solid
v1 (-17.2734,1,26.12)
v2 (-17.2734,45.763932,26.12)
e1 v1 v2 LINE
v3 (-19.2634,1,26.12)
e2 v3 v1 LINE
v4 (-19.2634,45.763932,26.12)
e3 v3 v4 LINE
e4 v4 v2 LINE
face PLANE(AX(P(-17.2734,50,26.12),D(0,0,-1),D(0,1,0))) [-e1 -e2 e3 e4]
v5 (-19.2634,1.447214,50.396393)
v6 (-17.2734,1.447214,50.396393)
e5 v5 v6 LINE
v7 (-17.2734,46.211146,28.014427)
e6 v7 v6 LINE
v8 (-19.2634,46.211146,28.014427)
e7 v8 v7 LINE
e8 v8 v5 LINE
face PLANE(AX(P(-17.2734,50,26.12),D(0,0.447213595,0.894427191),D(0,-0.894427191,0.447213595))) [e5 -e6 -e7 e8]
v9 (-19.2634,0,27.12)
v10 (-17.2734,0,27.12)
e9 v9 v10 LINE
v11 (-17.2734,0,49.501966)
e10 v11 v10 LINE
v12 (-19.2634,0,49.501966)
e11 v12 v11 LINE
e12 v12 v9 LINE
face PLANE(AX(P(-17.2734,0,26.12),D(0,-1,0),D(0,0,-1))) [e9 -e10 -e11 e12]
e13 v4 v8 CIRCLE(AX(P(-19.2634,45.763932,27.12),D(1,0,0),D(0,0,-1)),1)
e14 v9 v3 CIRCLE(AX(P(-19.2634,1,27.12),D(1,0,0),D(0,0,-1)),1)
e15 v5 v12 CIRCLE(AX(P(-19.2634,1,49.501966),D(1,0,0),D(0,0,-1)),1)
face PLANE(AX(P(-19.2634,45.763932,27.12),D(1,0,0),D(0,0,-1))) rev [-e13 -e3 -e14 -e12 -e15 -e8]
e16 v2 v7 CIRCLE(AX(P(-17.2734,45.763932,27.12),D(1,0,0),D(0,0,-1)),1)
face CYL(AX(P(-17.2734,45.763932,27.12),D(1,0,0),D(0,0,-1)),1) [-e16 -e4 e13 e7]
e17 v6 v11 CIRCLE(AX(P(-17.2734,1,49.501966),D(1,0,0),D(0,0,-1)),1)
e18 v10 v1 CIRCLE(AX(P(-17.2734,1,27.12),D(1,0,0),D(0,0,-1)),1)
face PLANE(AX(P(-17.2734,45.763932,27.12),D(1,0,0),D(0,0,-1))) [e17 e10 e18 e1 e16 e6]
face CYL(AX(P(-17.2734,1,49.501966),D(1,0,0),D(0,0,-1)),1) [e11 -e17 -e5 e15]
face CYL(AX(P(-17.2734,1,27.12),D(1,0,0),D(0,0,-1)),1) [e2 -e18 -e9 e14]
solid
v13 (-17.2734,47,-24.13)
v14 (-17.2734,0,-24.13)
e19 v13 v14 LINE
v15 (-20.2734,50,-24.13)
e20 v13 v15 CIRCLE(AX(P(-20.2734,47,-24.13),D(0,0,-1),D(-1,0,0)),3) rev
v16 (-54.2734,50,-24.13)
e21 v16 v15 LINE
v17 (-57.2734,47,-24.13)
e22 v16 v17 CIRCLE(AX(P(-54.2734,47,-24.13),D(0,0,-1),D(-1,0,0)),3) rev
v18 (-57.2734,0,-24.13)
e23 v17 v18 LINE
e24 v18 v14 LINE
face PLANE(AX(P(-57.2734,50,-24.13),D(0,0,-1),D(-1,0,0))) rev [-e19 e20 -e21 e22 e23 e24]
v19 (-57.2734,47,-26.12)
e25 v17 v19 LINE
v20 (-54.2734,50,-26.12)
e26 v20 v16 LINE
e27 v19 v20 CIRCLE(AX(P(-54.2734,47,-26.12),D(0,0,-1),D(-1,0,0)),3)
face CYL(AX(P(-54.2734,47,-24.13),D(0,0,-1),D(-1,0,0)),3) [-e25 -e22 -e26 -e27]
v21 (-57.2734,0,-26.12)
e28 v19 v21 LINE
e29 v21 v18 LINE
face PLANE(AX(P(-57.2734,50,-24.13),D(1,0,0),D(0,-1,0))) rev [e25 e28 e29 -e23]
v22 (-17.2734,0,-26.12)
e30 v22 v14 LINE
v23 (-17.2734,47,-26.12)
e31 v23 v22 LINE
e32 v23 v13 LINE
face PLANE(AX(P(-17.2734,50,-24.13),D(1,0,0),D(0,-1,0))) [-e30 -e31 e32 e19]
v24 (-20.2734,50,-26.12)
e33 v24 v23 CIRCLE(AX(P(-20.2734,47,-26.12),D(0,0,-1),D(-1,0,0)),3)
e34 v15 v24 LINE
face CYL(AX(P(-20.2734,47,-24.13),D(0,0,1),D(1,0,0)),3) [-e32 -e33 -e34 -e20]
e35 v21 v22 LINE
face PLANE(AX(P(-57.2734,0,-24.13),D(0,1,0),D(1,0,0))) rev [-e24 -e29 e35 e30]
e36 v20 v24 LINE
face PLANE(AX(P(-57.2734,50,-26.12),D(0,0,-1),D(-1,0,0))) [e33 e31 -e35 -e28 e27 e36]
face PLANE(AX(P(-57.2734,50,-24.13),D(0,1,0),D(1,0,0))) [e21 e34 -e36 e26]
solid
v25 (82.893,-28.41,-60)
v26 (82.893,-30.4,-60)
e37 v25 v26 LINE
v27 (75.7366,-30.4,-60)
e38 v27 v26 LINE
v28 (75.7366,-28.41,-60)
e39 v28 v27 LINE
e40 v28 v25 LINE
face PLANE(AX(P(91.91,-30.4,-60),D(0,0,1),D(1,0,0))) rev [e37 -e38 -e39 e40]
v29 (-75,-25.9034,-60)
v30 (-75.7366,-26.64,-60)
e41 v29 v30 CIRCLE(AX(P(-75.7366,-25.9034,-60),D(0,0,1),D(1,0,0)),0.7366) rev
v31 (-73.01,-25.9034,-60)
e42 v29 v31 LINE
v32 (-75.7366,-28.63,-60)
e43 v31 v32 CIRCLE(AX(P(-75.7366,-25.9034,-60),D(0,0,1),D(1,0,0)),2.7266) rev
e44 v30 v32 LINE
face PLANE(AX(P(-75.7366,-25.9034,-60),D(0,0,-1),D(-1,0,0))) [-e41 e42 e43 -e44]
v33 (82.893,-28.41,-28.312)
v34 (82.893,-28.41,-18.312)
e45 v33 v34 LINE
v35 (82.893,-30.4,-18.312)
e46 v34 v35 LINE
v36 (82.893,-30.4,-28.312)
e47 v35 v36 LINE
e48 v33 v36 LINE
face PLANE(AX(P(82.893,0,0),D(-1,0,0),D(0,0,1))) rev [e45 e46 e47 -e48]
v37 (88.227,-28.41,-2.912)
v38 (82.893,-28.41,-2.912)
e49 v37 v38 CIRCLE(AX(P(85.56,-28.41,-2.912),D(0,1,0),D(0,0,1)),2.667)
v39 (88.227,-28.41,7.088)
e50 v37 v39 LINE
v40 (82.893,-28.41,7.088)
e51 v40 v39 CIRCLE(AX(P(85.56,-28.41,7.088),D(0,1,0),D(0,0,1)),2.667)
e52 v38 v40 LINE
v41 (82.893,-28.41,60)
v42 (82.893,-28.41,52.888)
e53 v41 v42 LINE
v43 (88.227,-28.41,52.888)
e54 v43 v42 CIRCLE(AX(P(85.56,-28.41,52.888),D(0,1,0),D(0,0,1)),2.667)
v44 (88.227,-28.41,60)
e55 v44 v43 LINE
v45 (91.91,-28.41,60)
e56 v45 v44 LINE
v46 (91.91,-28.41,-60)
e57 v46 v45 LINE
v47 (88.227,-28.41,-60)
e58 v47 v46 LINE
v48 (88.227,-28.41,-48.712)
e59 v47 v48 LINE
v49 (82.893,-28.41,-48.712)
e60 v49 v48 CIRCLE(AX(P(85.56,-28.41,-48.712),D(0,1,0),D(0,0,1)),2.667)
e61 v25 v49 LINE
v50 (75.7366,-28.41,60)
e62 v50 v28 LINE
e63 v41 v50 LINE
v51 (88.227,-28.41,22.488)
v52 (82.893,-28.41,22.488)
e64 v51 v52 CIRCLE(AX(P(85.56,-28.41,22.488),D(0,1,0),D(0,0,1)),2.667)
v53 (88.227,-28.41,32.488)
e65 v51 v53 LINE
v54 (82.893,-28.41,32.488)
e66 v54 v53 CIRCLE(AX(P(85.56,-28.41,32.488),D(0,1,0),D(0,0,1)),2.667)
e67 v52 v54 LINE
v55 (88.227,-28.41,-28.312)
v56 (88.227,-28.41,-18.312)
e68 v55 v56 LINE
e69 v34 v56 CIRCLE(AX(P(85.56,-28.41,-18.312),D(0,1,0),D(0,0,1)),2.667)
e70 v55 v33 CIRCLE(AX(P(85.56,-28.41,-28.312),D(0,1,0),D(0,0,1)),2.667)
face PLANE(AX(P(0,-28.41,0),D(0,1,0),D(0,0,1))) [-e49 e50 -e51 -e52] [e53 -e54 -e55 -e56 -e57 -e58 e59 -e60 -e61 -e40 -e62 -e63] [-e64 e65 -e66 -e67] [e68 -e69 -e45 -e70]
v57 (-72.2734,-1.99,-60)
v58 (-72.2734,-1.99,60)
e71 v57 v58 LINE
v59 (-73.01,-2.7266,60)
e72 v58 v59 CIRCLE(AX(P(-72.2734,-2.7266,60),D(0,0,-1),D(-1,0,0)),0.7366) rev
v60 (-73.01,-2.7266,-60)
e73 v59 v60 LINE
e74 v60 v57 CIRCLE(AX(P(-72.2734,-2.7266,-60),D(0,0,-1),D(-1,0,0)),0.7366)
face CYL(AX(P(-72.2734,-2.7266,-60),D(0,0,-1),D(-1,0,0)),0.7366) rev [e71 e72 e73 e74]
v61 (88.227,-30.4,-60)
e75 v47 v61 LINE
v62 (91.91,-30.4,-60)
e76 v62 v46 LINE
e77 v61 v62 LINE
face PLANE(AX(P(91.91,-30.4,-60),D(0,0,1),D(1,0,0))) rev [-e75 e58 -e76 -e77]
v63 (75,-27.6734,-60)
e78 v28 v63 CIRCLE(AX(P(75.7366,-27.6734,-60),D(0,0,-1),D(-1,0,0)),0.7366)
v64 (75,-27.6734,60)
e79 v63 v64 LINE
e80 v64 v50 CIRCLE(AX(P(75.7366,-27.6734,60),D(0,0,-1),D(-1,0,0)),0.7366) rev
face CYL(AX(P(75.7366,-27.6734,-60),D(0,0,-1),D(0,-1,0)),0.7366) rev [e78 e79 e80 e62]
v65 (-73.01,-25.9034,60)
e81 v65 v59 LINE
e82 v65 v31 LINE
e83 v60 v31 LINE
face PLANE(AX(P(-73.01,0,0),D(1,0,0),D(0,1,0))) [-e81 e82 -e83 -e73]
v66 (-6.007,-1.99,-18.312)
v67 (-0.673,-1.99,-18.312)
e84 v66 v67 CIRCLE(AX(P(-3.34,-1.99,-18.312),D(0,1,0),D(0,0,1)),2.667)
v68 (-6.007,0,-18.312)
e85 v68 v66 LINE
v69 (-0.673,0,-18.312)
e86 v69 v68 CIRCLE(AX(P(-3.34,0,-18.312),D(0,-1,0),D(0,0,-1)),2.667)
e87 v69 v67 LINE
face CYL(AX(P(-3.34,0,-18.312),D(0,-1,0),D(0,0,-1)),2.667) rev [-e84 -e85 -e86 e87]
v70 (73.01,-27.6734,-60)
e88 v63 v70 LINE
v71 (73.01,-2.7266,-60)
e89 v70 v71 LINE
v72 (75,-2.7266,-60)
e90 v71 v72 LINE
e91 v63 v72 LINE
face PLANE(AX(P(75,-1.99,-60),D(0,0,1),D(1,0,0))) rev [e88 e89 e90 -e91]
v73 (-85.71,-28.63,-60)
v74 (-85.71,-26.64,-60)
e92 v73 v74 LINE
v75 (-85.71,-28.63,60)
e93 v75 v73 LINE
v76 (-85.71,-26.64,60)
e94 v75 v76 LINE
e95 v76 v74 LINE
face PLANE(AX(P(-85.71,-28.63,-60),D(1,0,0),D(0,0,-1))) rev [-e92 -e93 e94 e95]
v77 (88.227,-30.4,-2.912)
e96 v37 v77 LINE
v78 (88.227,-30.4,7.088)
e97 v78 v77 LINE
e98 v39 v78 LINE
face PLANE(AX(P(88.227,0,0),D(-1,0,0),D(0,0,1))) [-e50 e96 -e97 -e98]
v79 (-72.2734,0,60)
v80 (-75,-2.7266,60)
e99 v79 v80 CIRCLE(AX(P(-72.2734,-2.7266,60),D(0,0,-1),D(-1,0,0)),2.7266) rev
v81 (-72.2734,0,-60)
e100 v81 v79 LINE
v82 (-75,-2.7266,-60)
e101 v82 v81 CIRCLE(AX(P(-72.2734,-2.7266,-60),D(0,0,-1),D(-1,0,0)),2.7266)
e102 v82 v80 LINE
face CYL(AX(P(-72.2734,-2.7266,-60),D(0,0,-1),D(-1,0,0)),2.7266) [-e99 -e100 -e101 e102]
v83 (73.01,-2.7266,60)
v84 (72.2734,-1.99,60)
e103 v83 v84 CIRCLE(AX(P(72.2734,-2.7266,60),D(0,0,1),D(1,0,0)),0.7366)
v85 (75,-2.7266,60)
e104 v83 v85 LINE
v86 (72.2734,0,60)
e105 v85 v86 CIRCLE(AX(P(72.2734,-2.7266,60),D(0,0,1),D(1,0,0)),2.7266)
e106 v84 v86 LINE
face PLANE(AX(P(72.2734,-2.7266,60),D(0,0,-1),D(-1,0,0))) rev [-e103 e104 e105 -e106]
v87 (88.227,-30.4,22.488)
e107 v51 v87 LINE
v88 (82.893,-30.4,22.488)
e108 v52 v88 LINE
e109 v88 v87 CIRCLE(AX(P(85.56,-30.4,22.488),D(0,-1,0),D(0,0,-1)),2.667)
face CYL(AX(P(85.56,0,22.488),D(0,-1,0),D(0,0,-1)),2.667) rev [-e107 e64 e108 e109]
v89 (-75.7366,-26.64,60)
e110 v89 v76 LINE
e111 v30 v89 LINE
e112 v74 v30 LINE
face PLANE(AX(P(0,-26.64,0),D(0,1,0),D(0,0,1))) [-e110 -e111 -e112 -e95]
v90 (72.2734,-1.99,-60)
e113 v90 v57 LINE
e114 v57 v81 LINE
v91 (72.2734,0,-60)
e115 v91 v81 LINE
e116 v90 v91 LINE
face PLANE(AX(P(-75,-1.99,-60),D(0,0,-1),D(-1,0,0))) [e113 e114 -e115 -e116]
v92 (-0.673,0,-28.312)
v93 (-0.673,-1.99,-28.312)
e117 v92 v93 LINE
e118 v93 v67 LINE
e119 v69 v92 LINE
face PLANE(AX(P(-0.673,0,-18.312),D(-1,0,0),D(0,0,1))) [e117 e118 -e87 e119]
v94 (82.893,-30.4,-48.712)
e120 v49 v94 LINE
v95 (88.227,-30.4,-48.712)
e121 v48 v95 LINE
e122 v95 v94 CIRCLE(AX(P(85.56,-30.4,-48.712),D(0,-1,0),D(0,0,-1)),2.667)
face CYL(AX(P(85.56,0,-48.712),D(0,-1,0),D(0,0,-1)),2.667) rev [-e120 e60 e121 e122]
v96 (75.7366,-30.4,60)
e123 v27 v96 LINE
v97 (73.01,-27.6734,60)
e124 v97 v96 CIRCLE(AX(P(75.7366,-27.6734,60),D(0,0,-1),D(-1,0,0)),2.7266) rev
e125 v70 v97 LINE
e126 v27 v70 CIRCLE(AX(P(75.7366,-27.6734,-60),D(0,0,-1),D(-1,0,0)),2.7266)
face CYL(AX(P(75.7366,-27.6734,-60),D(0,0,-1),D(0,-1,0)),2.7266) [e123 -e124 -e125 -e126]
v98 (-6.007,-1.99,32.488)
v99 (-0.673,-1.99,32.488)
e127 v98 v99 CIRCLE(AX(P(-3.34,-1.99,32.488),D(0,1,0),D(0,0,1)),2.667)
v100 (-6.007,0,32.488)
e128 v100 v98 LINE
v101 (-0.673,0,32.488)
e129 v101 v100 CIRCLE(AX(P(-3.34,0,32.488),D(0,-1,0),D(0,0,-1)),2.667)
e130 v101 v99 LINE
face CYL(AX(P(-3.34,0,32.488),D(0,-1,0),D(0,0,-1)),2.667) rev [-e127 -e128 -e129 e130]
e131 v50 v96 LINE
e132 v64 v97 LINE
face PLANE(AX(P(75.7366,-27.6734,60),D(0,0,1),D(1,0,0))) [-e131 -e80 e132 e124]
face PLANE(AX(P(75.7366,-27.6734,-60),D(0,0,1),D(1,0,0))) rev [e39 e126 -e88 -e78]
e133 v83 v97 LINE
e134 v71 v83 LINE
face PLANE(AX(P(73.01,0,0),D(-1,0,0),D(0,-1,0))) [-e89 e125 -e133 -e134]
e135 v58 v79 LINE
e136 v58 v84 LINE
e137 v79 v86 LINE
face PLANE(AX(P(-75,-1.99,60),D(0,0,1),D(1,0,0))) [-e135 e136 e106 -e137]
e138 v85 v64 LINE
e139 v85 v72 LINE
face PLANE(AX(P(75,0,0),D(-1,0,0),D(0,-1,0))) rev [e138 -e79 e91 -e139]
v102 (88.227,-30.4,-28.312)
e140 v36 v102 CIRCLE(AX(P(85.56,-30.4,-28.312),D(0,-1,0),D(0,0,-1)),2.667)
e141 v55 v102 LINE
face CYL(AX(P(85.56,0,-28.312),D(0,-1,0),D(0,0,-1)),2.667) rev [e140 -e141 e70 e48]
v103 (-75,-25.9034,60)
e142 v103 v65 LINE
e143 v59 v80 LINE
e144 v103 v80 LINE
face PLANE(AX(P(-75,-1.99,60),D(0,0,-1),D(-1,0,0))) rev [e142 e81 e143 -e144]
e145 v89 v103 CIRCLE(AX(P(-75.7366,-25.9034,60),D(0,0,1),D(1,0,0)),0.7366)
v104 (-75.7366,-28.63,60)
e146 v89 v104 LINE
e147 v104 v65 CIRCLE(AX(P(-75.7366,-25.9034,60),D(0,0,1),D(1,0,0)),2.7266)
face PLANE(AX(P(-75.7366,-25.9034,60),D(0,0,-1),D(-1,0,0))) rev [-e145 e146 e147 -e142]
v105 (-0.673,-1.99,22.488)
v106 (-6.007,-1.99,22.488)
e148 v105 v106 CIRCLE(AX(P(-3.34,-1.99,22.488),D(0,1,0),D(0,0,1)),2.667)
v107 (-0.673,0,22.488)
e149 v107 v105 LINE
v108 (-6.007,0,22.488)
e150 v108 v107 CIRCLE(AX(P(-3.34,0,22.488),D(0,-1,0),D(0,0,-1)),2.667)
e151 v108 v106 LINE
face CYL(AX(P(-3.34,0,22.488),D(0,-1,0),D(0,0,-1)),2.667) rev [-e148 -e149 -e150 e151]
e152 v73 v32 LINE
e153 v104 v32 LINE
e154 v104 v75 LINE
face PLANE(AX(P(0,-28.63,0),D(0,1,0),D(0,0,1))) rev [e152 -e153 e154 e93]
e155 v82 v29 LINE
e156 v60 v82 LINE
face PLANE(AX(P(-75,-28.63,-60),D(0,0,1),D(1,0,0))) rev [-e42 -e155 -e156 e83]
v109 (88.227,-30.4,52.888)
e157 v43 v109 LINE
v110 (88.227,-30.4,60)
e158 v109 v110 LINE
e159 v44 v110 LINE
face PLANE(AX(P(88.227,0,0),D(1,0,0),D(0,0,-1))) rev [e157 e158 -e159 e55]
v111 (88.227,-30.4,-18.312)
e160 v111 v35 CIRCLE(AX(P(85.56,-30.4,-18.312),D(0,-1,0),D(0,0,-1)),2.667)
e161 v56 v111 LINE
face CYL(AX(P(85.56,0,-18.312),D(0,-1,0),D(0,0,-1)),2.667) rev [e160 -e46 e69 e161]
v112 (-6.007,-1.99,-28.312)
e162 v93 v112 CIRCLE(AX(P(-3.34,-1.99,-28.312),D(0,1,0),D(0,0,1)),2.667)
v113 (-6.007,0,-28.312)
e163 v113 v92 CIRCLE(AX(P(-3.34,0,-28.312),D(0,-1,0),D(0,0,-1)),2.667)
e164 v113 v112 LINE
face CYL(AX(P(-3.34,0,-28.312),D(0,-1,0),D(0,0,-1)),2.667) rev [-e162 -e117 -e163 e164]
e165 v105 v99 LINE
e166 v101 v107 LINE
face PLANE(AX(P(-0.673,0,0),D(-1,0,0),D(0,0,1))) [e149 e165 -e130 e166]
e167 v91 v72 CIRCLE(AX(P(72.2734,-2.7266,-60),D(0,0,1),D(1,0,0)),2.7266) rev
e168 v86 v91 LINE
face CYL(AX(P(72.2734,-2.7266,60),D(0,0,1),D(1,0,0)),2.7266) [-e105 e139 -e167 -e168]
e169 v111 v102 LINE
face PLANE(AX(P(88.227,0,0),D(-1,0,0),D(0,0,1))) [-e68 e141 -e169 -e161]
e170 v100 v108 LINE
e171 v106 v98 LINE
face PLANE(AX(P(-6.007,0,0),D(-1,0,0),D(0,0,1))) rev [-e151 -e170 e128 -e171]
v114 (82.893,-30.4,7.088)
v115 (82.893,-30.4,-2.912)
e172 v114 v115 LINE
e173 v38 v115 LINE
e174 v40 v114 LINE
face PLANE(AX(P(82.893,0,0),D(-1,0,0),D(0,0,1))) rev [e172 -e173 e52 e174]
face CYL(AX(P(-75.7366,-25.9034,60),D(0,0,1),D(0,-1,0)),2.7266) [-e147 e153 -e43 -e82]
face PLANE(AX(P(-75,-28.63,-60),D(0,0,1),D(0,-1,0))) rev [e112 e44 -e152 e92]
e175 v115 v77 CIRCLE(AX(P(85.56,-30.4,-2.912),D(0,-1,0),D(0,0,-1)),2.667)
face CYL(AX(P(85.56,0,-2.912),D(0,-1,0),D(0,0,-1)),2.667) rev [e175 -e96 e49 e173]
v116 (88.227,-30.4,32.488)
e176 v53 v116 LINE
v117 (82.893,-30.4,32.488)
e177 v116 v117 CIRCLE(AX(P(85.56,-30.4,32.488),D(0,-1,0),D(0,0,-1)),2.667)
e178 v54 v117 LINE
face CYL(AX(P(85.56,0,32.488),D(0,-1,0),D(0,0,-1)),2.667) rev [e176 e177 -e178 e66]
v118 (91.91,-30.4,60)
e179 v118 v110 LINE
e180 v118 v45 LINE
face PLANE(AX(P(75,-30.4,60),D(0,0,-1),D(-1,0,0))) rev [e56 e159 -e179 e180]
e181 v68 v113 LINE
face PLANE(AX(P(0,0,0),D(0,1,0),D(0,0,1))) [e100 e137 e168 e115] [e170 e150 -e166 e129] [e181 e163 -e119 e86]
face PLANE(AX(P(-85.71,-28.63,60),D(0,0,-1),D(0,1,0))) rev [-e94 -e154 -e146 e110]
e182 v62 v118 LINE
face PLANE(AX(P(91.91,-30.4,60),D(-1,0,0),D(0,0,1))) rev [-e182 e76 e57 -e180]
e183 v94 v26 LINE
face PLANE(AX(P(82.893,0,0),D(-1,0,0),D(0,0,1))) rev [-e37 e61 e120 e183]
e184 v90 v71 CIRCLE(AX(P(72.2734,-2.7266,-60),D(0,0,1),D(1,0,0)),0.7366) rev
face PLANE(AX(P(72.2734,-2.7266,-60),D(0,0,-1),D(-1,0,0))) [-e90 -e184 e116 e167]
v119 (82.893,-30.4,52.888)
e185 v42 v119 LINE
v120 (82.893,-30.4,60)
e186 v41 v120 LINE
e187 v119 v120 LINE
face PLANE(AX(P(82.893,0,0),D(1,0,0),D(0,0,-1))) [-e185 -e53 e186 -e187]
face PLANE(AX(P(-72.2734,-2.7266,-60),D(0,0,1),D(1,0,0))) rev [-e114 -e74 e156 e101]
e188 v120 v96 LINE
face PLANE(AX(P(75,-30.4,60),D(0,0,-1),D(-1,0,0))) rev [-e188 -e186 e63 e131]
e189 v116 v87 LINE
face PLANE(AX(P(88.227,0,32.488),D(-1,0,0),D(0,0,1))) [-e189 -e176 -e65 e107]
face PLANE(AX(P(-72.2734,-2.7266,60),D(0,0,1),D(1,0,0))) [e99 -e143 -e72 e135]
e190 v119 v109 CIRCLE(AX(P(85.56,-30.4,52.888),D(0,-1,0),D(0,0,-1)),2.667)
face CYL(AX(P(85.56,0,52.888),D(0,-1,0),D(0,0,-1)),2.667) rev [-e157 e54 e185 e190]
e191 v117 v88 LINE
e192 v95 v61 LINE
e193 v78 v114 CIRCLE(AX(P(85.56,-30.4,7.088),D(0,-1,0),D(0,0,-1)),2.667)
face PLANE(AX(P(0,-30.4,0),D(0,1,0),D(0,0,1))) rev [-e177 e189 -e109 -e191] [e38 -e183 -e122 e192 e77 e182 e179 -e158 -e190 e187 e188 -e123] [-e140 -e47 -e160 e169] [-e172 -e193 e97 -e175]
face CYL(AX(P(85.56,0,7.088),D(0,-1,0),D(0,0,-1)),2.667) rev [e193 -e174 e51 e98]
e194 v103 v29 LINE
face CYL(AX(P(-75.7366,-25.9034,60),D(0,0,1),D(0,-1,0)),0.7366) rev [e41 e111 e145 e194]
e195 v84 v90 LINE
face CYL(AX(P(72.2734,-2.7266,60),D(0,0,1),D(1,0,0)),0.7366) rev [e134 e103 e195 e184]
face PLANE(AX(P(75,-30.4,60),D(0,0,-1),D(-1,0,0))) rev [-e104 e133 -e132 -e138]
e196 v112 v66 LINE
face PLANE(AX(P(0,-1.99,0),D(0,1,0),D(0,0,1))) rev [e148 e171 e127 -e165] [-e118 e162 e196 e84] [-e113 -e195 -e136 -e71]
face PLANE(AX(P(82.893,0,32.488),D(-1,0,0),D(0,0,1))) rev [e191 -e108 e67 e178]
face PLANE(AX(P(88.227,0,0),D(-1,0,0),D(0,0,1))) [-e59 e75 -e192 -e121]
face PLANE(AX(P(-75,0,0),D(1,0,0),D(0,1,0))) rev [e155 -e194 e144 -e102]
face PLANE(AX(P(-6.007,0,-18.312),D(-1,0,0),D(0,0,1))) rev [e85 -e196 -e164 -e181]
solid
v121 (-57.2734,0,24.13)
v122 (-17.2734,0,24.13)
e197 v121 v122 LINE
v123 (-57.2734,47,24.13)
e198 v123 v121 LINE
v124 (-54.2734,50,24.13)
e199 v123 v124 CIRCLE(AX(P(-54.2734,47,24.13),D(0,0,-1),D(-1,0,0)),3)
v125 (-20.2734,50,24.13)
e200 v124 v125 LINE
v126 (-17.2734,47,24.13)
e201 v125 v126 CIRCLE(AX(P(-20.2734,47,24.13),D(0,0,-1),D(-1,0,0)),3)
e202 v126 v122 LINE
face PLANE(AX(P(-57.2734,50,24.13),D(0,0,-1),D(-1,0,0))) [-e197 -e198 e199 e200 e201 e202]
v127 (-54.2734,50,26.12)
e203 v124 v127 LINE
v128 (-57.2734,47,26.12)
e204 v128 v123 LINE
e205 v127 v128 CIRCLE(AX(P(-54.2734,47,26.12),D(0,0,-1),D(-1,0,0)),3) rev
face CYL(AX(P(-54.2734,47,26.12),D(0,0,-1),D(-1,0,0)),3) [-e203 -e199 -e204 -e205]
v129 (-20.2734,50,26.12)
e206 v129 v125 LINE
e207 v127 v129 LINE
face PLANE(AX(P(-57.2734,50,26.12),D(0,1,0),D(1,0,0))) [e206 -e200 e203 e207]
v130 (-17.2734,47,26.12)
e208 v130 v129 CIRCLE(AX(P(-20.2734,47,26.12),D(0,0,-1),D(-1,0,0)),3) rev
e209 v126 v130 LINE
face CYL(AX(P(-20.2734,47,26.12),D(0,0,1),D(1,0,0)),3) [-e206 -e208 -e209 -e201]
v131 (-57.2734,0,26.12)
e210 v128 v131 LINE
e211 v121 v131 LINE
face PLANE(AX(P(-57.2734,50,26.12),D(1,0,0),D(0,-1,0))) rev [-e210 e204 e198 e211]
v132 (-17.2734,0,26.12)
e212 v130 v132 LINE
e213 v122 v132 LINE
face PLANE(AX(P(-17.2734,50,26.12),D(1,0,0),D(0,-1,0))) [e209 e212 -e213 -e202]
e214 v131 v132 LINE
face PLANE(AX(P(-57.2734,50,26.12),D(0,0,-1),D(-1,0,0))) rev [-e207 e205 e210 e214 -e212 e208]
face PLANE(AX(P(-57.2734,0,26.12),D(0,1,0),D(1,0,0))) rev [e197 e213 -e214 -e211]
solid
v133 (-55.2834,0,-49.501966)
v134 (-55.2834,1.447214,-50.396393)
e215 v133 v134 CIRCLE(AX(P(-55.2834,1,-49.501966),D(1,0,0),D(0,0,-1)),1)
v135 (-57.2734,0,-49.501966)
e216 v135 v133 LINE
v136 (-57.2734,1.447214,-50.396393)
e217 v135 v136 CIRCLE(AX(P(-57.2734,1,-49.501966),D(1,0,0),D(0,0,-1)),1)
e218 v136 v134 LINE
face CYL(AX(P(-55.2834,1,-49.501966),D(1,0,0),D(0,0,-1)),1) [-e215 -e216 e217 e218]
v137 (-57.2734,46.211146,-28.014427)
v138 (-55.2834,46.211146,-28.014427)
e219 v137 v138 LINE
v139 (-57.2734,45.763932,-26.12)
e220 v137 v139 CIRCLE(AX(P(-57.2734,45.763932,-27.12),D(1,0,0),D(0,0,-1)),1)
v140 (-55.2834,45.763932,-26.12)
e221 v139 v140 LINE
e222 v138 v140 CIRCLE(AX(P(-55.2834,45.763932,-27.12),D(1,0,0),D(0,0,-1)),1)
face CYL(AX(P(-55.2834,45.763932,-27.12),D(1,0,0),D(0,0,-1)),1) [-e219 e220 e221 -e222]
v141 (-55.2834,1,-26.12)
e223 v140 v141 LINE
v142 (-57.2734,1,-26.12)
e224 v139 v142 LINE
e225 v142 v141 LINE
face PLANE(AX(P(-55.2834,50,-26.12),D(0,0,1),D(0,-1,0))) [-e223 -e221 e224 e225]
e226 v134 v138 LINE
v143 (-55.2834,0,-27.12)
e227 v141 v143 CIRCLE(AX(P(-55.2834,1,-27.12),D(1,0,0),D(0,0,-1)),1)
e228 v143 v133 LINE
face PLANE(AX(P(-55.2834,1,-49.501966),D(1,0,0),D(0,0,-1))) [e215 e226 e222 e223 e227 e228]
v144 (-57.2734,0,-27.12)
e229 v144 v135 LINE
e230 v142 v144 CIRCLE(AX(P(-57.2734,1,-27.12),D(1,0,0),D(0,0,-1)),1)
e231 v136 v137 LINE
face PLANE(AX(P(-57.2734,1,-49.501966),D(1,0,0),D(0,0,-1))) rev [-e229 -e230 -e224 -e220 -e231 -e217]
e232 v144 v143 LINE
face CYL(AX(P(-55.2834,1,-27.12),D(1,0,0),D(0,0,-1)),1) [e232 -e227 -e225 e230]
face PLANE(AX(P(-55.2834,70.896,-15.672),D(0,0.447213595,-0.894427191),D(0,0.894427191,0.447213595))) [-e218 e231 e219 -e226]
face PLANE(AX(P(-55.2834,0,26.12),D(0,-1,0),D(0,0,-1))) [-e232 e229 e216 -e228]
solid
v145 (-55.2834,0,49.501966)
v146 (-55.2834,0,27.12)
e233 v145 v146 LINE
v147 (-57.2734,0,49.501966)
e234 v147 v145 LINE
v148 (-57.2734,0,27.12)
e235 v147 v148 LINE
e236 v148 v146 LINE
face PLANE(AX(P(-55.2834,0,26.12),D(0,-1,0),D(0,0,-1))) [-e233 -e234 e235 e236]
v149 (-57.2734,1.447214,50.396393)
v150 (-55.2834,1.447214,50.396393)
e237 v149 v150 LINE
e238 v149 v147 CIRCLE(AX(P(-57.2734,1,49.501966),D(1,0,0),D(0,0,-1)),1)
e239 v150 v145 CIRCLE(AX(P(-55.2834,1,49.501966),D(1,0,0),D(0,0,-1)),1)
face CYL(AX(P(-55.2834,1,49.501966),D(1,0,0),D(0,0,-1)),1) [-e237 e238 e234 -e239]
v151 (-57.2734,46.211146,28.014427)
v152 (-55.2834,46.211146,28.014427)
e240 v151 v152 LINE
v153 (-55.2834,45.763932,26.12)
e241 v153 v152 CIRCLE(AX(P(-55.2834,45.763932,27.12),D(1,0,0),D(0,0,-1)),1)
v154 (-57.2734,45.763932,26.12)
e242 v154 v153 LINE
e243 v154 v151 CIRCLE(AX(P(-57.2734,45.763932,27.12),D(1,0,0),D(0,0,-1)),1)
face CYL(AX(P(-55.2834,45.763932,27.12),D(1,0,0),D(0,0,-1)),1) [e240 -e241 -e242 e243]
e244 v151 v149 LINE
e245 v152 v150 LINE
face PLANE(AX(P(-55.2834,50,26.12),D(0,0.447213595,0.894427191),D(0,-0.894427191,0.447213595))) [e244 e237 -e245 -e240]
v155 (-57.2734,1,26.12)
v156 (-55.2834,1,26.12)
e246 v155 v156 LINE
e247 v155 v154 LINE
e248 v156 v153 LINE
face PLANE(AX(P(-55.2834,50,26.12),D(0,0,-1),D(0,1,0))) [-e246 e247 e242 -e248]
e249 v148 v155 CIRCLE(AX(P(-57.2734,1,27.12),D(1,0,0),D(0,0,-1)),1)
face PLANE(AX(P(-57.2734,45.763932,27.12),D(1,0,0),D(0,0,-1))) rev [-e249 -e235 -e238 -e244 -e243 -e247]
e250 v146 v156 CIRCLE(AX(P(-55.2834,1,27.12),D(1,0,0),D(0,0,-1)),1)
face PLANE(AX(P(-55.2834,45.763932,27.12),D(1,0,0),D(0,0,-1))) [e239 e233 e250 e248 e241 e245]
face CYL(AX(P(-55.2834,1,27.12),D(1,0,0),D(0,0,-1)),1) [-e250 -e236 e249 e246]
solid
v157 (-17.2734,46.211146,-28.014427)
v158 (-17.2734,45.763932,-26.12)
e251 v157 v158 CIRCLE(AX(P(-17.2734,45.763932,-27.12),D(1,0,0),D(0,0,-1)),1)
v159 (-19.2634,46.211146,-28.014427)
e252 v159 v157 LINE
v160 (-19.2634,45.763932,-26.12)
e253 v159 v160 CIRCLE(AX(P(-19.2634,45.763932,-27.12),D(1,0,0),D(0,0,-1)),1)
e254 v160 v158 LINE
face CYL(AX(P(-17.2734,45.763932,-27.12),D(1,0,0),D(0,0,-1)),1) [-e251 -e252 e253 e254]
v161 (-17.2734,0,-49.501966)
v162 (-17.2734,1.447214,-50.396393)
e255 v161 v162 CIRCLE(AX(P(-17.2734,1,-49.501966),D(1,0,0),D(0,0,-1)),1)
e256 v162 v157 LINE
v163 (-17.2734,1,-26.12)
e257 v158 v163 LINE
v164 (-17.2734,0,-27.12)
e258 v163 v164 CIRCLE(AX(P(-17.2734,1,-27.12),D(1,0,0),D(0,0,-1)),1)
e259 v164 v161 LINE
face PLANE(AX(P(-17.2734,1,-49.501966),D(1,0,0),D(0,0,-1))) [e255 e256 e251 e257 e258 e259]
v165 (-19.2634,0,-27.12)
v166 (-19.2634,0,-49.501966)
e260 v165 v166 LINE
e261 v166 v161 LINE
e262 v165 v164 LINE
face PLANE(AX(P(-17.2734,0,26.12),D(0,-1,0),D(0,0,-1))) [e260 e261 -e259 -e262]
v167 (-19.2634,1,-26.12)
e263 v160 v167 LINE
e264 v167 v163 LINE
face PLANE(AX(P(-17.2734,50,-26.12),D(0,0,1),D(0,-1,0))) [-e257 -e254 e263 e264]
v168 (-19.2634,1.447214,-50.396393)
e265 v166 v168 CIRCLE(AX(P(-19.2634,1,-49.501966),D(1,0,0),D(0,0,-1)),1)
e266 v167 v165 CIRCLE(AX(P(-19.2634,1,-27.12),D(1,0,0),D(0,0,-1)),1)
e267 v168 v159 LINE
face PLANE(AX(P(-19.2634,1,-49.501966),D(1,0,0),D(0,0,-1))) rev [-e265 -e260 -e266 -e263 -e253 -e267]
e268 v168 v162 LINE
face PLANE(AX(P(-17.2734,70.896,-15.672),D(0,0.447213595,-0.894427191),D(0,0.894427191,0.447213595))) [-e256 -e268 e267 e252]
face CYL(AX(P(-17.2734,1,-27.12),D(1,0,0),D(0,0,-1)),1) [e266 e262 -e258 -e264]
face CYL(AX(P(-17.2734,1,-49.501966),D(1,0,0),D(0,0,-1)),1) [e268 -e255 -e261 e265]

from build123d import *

# Parameters (mm, degrees)
SKETCH1_W                    = 150
SKETCH1_H                    = 120
BASE_FLANGE1_DEPTH           = 1.99
EDGE_FLANGE1_STRIP_W         = 9.4332
EDGE_FLANGE1_STRIP_H         = 1.99
EDGE_FLANGE1_STRIP_CUT_DEPTH = 120
EDGE_FLANGE1_DEPTH           = 120
EDGE_FLANGE2_STRIP_W         = 9.4332
EDGE_FLANGE2_STRIP_H         = 1.99
EDGE_FLANGE2_STRIP_CUT_DEPTH = 120
EDGE_FLANGE2_DEPTH           = 120
EDGE_FLANGE3_STRIP_W         = 9.4332
EDGE_FLANGE3_STRIP_H         = 1.99
EDGE_FLANGE3_STRIP_CUT_DEPTH = 120
EDGE_FLANGE3_DEPTH           = 120
EDGE_FLANGE4_STRIP_W         = 9.4332
EDGE_FLANGE4_STRIP_H         = 1.99
EDGE_FLANGE4_STRIP_CUT_DEPTH = 120
EDGE_FLANGE4_DEPTH           = 120
CUT_EXTRUDE1_DEPTH           = 114.892967737
SKETCH22_W                   = 40
SKETCH22_H                   = 1.99
BOSS_EXTRUDE1_DEPTH          = 50
BOSS_EXTRUDE1_2_DEPTH        = 50
BOSS_EXTRUDE2_START          = -17.2734
BOSS_EXTRUDE2_DEPTH          = 1.99
BOSS_EXTRUDE2_2_DEPTH        = 1.99
BOSS_EXTRUDE3_START          = -57.2734
BOSS_EXTRUDE3_DEPTH          = 1.99
BOSS_EXTRUDE3_2_DEPTH        = 1.99
FILLET1_R                    = 3
FILLET2_R                    = 3


# Sheet-metal steps are written as plain solids
with BuildPart() as part:
    # Sketch1 → Base-Flange1 (new body)
    with BuildSketch(Plane(origin=(0, 0, 0), x_dir=(1, 0, 0), z_dir=(0, 1, 0))):
        Rectangle(SKETCH1_W, SKETCH1_H)
    extrude(amount=-BASE_FLANGE1_DEPTH)

    # Edge-Flange1 strip (across the edge) → Edge-Flange1 strip cut (cut)
    with BuildSketch(Plane(origin=(75, -1.99, -60), x_dir=(-1, 0, 0), z_dir=(0, 0, 1))):
        with Locations((-1.99, -0.995)):
            Rectangle(EDGE_FLANGE1_STRIP_W, EDGE_FLANGE1_STRIP_H)
    extrude(amount=EDGE_FLANGE1_STRIP_CUT_DEPTH, mode=Mode.SUBTRACT)

    # Edge-Flange1 section (across the edge) → Edge-Flange1 (add)
    with BuildSketch(Plane(origin=(75, -1.99, -60), x_dir=(-1, 0, 0), z_dir=(0, 0, 1))):
        with BuildLine():
            Line((0, 0.7366), (0, 28.41))
            Line((0, 28.41), (1.99, 28.41))
            Line((1.99, 28.41), (1.99, 0.7366))
            ThreePointArc((1.99, 0.7366), (2.205745145, 0.215745145), (2.7266, 0))
            Line((2.7266, 0), (2.7266, -1.99))
            ThreePointArc((2.7266, -1.99), (0.79860265, -1.19139735), (0, 0.7366))
        make_face()
    extrude(amount=EDGE_FLANGE1_DEPTH)

    # Edge-Flange2 strip (across the edge) → Edge-Flange2 strip cut (cut)
    with BuildSketch(Plane(origin=(75, -30.4, 60), x_dir=(0, 1, 0), z_dir=(0, 0, -1))):
        with Locations((-1.99, -0.995)):
            Rectangle(EDGE_FLANGE2_STRIP_W, EDGE_FLANGE2_STRIP_H)
    extrude(amount=EDGE_FLANGE2_STRIP_CUT_DEPTH, mode=Mode.SUBTRACT)

    # Edge-Flange2 section (across the edge) → Edge-Flange2 (add)
    with BuildSketch(Plane(origin=(75, -30.4, 60), x_dir=(0, 1, 0), z_dir=(0, 0, -1))):
        with BuildLine():
            Line((0, 0.7366), (0, 16.91))
            Line((0, 16.91), (1.99, 16.91))
            Line((1.99, 16.91), (1.99, 0.7366))
            ThreePointArc((1.99, 0.7366), (2.205745145, 0.215745145), (2.7266, 0))
            Line((2.7266, 0), (2.7266, -1.99))
            ThreePointArc((2.7266, -1.99), (0.79860265, -1.19139735), (0, 0.7366))
        make_face()
    extrude(amount=EDGE_FLANGE2_DEPTH)

    # Edge-Flange3 strip (across the edge) → Edge-Flange3 strip cut (cut)
    with BuildSketch(Plane(origin=(-75, -1.99, 60), x_dir=(1, 0, 0), z_dir=(0, 0, -1))):
        with Locations((-1.99, -0.995)):
            Rectangle(EDGE_FLANGE3_STRIP_W, EDGE_FLANGE3_STRIP_H)
    extrude(amount=EDGE_FLANGE3_STRIP_CUT_DEPTH, mode=Mode.SUBTRACT)

    # Edge-Flange3 section (across the edge) → Edge-Flange3 (add)
    with BuildSketch(Plane(origin=(-75, -1.99, 60), x_dir=(1, 0, 0), z_dir=(0, 0, -1))):
        with BuildLine():
            Line((0, 0.7366), (0, 26.64))
            Line((0, 26.64), (1.99, 26.64))
            Line((1.99, 26.64), (1.99, 0.7366))
            ThreePointArc((1.99, 0.7366), (2.205745145, 0.215745145), (2.7266, 0))
            Line((2.7266, 0), (2.7266, -1.99))
            ThreePointArc((2.7266, -1.99), (0.79860265, -1.19139735), (0, 0.7366))
        make_face()
    extrude(amount=EDGE_FLANGE3_DEPTH)

    # Edge-Flange4 strip (across the edge) → Edge-Flange4 strip cut (cut)
    with BuildSketch(Plane(origin=(-75, -28.63, -60), x_dir=(0, 1, 0), z_dir=(0, 0, 1))):
        with Locations((-1.99, -0.995)):
            Rectangle(EDGE_FLANGE4_STRIP_W, EDGE_FLANGE4_STRIP_H)
    extrude(amount=EDGE_FLANGE4_STRIP_CUT_DEPTH, mode=Mode.SUBTRACT)

    # Edge-Flange4 section (across the edge) → Edge-Flange4 (add)
    with BuildSketch(Plane(origin=(-75, -28.63, -60), x_dir=(0, 1, 0), z_dir=(0, 0, 1))):
        with BuildLine():
            Line((0, 0.7366), (0, 10.71))
            Line((0, 10.71), (1.99, 10.71))
            Line((1.99, 10.71), (1.99, 0.7366))
            ThreePointArc((1.99, 0.7366), (2.205745145, 0.215745145), (2.7266, 0))
            Line((2.7266, 0), (2.7266, -1.99))
            ThreePointArc((2.7266, -1.99), (0.79860265, -1.19139735), (0, 0.7366))
        make_face()
    extrude(amount=EDGE_FLANGE4_DEPTH)

    # Sketch20 → Cut-Extrude1 (cut, through all)
    with BuildSketch(Plane(origin=(0, -30.4, 0), x_dir=(-1, 0, 0), z_dir=(0, -1, 0))):
        with BuildLine():
            Line((6.007, -32.488), (6.007, -22.488))
            ThreePointArc((6.007, -22.488), (3.34, -19.821), (0.673, -22.488))
            Line((0.673, -22.488), (0.673, -32.488))
            ThreePointArc((0.673, -32.488), (3.34, -35.155), (6.007, -32.488))
        make_face()
        with BuildLine():
            Line((-82.893, -60), (-82.893, -52.888))
            ThreePointArc((-82.893, -52.888), (-85.56, -50.221), (-88.227, -52.888))
            Line((-88.227, -52.888), (-88.227, -60))
            Line((-88.227, -60), (-82.893, -60))
        make_face()
        with BuildLine():
            Line((-82.893, -7.088), (-82.893, 2.912))
            ThreePointArc((-82.893, 2.912), (-85.56, 5.579), (-88.227, 2.912))
            Line((-88.227, 2.912), (-88.227, -7.088))
            ThreePointArc((-88.227, -7.088), (-85.56, -9.755), (-82.893, -7.088))
        make_face()
        with BuildLine():
            Line((-82.893, 18.312), (-82.893, 28.312))
            ThreePointArc((-82.893, 28.312), (-85.56, 30.979), (-88.227, 28.312))
            Line((-88.227, 28.312), (-88.227, 18.312))
            ThreePointArc((-88.227, 18.312), (-85.56, 15.645), (-82.893, 18.312))
        make_face()
        with BuildLine():
            Line((-88.227, 60), (-88.227, 48.712))
            ThreePointArc((-88.227, 48.712), (-85.56, 46.045), (-82.893, 48.712))
            Line((-82.893, 48.712), (-82.893, 60))
            Line((-82.893, 60), (-88.227, 60))
        make_face()
        with BuildLine():
            ThreePointArc((6.007, 28.312), (3.34, 30.979), (0.673, 28.312))
            Line((0.673, 28.312), (0.673, 18.312))
            ThreePointArc((0.673, 18.312), (3.34, 15.645), (6.007, 18.312))
            Line((6.007, 18.312), (6.007, 28.312))
        make_face()
        with BuildLine():
            Line((-82.893, -32.488), (-82.893, -22.488))
            ThreePointArc((-82.893, -22.488), (-85.56, -19.821), (-88.227, -22.488))
            Line((-88.227, -22.488), (-88.227, -32.488))
            ThreePointArc((-88.227, -32.488), (-85.56, -35.155), (-82.893, -32.488))
        make_face()
    extrude(amount=-CUT_EXTRUDE1_DEPTH, mode=Mode.SUBTRACT)


with BuildPart() as body_2:
    # Sketch22 → Boss-Extrude1 (new body)
    with BuildSketch(Plane(origin=(0, 0, 0), x_dir=(1, 0, 0), z_dir=(0, 1, 0))):
        with Locations((-37.2734, 25.125)):
            Rectangle(SKETCH22_W, SKETCH22_H)
    extrude(amount=BOSS_EXTRUDE1_DEPTH)

    # Fillet2
    fillet2_edges = [body_2.edges().sort_by_distance(p)[0] for p in [
        (-57.2734, 50, -25.125),
        (-17.2734, 50, -25.125),
    ]]
    fillet(fillet2_edges, radius=FILLET2_R)


with BuildPart() as body_3:
    # Sketch22 → Boss-Extrude1 2 (new body)
    with BuildSketch(Plane(origin=(0, 0, 0), x_dir=(1, 0, 0), z_dir=(0, 1, 0))):
        with Locations((-37.2734, -25.125)):
            Rectangle(SKETCH22_W, SKETCH22_H)
    extrude(amount=BOSS_EXTRUDE1_2_DEPTH)

    # Fillet1
    fillet1_edges = [body_3.edges().sort_by_distance(p)[0] for p in [
        (-57.2734, 50, 25.125),
        (-17.2734, 50, 25.125),
    ]]
    fillet(fillet1_edges, radius=FILLET1_R)


with BuildPart() as body_4:
    # Sketch27 → Boss-Extrude2 (new body)
    with BuildSketch(Plane(origin=(0, 0, 0), x_dir=(0, 0, -1), z_dir=(1, 0, 0)).offset(BOSS_EXTRUDE2_START)):
        with BuildLine():
            Line((-28.014427191, 46.211145618), (-50.396393202, 1.447213595))
            ThreePointArc((-50.396393202, 1.447213595), (-50.35261682, 0.474268888), (-49.501966011, 0))
            Line((-49.501966011, 0), (-27.12, 0))
            ThreePointArc((-27.12, 0), (-26.412893219, 0.292893219), (-26.12, 1))
            Line((-26.12, 1), (-26.12, 45.763932023))
            ThreePointArc((-26.12, 45.763932023), (-26.890247079, 46.737181012), (-28.014427191, 46.211145618))
        make_face()
    extrude(amount=-BOSS_EXTRUDE2_DEPTH)


with BuildPart() as body_5:
    # Sketch27 → Boss-Extrude2 2 (new body)
    with BuildSketch(Plane(origin=(0, 0, 0), x_dir=(0, 0, -1), z_dir=(1, 0, 0)).offset(BOSS_EXTRUDE2_START)):
        with BuildLine():
            Line((49.501966011, 0), (27.12, 0))
            ThreePointArc((27.12, 0), (26.412893219, 0.292893219), (26.12, 1))
            Line((26.12, 1), (26.12, 45.763932023))
            ThreePointArc((26.12, 45.763932023), (26.890247079, 46.737181012), (28.014427191, 46.211145618))
            Line((28.014427191, 46.211145618), (50.396393202, 1.447213595))
            ThreePointArc((50.396393202, 1.447213595), (50.35261682, 0.474268888), (49.501966011, 0))
        make_face()
    extrude(amount=-BOSS_EXTRUDE2_2_DEPTH)


with BuildPart() as body_6:
    # Sketch27<2> → Boss-Extrude3 (new body)
    with BuildSketch(Plane(origin=(0, 0, 0), x_dir=(0, 0, -1), z_dir=(1, 0, 0)).offset(BOSS_EXTRUDE3_START)):
        with BuildLine():
            Line((-28.014427191, 46.211145618), (-50.396393202, 1.447213595))
            ThreePointArc((-50.396393202, 1.447213595), (-50.35261682, 0.474268888), (-49.501966011, 0))
            Line((-49.501966011, 0), (-27.12, 0))
            ThreePointArc((-27.12, 0), (-26.412893219, 0.292893219), (-26.12, 1))
            Line((-26.12, 1), (-26.12, 45.763932023))
            ThreePointArc((-26.12, 45.763932023), (-26.890247079, 46.737181012), (-28.014427191, 46.211145618))
        make_face()
    extrude(amount=BOSS_EXTRUDE3_DEPTH)


with BuildPart() as body_7:
    # Sketch27<2> → Boss-Extrude3 2 (new body)
    with BuildSketch(Plane(origin=(0, 0, 0), x_dir=(0, 0, -1), z_dir=(1, 0, 0)).offset(BOSS_EXTRUDE3_START)):
        with BuildLine():
            Line((49.501966011, 0), (27.12, 0))
            ThreePointArc((27.12, 0), (26.412893219, 0.292893219), (26.12, 1))
            Line((26.12, 1), (26.12, 45.763932023))
            ThreePointArc((26.12, 45.763932023), (26.890247079, 46.737181012), (28.014427191, 46.211145618))
            Line((28.014427191, 46.211145618), (50.396393202, 1.447213595))
            ThreePointArc((50.396393202, 1.447213595), (50.35261682, 0.474268888), (49.501966011, 0))
        make_face()
    extrude(amount=BOSS_EXTRUDE3_2_DEPTH)


solid = Compound([part.part, body_2.part, body_3.part, body_4.part, body_5.part, body_6.part, body_7.part])
